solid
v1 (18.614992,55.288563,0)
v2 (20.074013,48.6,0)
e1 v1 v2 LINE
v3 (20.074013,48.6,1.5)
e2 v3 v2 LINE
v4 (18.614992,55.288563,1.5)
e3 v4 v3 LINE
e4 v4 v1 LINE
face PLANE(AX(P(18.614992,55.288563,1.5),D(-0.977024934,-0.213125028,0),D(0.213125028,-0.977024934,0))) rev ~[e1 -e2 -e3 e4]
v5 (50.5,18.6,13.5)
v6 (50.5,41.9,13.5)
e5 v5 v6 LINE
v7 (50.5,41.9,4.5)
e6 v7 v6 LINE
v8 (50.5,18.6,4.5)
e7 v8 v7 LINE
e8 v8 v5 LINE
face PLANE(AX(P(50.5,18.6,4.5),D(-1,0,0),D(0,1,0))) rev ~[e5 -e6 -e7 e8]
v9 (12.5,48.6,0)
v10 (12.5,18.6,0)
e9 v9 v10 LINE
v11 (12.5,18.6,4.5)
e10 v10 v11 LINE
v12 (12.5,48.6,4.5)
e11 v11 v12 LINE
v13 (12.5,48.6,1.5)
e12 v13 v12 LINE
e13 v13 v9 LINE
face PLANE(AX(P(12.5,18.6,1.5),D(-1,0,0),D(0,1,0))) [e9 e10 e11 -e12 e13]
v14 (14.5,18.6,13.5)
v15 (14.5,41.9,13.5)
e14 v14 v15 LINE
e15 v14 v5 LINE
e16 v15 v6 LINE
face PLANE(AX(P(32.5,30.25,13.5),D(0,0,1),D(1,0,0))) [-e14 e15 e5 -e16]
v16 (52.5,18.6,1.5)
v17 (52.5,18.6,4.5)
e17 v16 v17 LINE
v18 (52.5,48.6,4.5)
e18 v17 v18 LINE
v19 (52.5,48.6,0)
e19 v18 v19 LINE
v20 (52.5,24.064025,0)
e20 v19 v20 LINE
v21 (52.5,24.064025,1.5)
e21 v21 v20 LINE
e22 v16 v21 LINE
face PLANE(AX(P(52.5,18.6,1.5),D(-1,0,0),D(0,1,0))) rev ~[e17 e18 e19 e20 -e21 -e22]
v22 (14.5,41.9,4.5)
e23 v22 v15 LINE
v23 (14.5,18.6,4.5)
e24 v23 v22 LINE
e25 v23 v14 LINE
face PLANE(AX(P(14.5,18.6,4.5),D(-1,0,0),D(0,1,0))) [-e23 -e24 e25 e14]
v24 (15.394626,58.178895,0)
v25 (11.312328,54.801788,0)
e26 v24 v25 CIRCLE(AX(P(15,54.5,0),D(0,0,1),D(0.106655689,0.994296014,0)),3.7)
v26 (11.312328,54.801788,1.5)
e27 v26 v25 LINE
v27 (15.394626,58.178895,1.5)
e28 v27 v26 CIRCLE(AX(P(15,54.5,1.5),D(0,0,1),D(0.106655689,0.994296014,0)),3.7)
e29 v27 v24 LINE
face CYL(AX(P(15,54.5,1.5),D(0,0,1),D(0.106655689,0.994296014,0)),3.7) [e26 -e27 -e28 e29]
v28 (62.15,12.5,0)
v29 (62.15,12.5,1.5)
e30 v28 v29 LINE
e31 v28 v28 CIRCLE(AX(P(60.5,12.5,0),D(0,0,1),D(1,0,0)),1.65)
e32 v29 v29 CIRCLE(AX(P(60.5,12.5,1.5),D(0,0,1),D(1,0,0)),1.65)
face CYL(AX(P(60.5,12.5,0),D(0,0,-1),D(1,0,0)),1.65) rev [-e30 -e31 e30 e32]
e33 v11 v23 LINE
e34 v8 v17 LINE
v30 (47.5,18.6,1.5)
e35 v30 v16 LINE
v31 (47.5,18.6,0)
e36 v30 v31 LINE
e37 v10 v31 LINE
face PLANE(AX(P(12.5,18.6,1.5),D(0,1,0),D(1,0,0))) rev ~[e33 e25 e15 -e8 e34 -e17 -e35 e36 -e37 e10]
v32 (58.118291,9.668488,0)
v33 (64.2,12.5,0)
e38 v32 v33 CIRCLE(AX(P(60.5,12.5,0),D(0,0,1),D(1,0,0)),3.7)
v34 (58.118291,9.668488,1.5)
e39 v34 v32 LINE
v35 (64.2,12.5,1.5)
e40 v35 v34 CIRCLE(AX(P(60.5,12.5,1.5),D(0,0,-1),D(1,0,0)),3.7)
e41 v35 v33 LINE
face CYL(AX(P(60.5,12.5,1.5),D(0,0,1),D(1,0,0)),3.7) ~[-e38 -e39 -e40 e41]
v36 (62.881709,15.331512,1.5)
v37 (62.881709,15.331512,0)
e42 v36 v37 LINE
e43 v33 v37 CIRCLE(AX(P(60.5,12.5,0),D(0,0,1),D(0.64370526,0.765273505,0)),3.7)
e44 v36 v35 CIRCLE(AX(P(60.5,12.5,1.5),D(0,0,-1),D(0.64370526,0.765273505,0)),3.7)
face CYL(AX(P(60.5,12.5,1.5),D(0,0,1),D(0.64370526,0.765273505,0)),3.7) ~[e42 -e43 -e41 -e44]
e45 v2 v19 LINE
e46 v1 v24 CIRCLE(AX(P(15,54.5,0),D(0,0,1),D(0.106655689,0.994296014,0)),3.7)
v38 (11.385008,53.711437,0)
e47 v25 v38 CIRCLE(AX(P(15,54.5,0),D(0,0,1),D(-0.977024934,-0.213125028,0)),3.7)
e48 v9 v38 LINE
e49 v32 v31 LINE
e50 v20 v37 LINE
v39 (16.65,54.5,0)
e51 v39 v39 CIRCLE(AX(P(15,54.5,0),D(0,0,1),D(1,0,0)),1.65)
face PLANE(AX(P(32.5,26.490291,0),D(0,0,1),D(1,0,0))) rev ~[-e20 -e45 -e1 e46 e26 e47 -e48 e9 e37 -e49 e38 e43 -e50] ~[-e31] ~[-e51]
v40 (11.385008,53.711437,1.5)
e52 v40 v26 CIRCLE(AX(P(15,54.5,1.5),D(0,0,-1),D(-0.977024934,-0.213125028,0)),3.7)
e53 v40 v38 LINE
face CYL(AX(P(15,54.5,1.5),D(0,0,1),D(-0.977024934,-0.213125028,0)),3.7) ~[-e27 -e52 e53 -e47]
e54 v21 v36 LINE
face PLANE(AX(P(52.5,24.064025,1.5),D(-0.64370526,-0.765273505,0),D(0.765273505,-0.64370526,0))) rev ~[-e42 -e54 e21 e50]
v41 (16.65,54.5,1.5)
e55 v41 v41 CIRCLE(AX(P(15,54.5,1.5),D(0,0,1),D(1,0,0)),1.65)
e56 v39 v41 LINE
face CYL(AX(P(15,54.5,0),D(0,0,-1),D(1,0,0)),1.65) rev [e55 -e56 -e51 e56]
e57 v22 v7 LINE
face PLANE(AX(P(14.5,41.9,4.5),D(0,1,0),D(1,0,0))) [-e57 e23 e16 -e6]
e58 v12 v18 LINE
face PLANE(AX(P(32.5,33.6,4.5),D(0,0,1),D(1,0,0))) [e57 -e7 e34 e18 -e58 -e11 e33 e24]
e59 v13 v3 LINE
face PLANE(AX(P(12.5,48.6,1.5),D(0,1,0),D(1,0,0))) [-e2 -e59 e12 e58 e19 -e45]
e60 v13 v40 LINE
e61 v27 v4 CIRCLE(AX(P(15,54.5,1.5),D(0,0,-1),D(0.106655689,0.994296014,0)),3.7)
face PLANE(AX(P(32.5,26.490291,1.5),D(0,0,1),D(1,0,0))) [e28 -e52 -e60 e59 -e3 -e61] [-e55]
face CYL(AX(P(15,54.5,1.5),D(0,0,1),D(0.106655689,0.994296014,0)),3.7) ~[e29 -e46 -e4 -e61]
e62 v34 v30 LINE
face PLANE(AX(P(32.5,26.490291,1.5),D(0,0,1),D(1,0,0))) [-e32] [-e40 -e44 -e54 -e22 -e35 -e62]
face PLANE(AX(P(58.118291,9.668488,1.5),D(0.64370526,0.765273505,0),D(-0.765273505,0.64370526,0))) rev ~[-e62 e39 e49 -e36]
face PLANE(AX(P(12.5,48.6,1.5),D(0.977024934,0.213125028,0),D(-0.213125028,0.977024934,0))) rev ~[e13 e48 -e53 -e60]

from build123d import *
from build123d import SkipClean  # not in build123d's __all__

# Parameters (mm, degrees)
F0_R      = 1.65
F1_DEPTH  = 1.5
F3_DEPTH  = 1.501
F4_DEPTH  = 1.5
F5_W      = 40
F5_H      = 30
F6_DEPTH  = 3
F7_W      = 36
F7_H      = 23.3
F8_DEPTH  = 9
F10_DEPTH = 1.501


with BuildPart() as f1:
    # F0 (on Top) → F1 (new body)
    with BuildSketch(Plane.XY):
        with BuildLine():
            ThreePointArc((-0.73370891, 14), (-0.4891889552, 6.9935887205), (0, 0))
            Line((0, 0), (65, 0))
            ThreePointArc((65, 0), (65.4891889552, 6.9935887205), (65.73370891, 14))
            ThreePointArc((65.73370891, 14), (65.7334108185, 21.0021379582), (65.488741818, 28))
            Line((65.488741818, 28), (57.299411547, 50.5))
            ThreePointArc((57.299411547, 50.5), (32.5, 63.5), (7.700588453, 50.5))
            Line((7.700588453, 50.5), (-0.488741818, 28))
            ThreePointArc((-0.488741818, 28), (-0.7334108185, 21.0021379582), (-0.73370891, 14))
        make_face()
        with Locations((4.5, 12.5)):
            Circle(F0_R, mode=Mode.SUBTRACT)
        with Locations((60.5, 12.5)):
            Circle(F0_R, mode=Mode.SUBTRACT)
        with Locations((15, 54.5)):
            Circle(F0_R, mode=Mode.SUBTRACT)
    extrude(amount=F1_DEPTH)

    # F2 (on face) → F3 (cut, through all)
    with BuildSketch(Plane.XY.offset(1.5)):
        with BuildLine():
            ThreePointArc((15.3946260476, 58.178895253), (17.4713893755, 57.2535857631), (18.6149922575, 55.2885626028))
            Line((18.6149922575, 55.2885626028), (20.0740134556, 48.6))
            Line((20.0740134556, 48.6), (52.5, 48.6))
            Line((52.5, 48.6), (52.5, 24.064025175))
            Line((52.5, 24.064025175), (62.8817094627, 15.3315119698))
            ThreePointArc((62.8817094627, 15.3315119698), (63.8542752579, 14.0616777817), (64.2, 12.5))
            ThreePointArc((64.2, 12.5), (62.0616777817, 9.1457247421), (58.1182905373, 9.6684880302))
            Line((58.1182905373, 9.6684880302), (47.5, 18.6))
            Line((47.5, 18.6), (17.5, 18.6))
            Line((17.5, 18.6), (6.8817094627, 9.6684880302))
            ThreePointArc((6.8817094627, 9.6684880302), (1.6684880302, 10.1182905373), (2.1182905373, 15.3315119698))
            Line((2.1182905373, 15.3315119698), (12.5, 24.064025175))
            Line((12.5, 24.064025175), (12.5, 48.6))
            Line((12.5, 48.6), (11.3850077425, 53.7114373972))
            ThreePointArc((11.3850077425, 53.7114373972), (11.308192582, 54.2539146721), (11.3123280961, 54.8017878876))
            ThreePointArc((11.3123280961, 54.8017878876), (9.4060764304, 52.7351735725), (7.700588453, 50.5))
            Line((7.700588453, 50.5), (-0.488741818, 28))
            ThreePointArc((-0.488741818, 28), (-0.733560046, 13.9914611719), (0, 0))
            Line((0, 0), (65, 0))
            ThreePointArc((65, 0), (65.733560046, 13.9914611719), (65.488741818, 28))
            Line((65.488741818, 28), (57.299411547, 50.5))
            ThreePointArc((57.299411547, 50.5), (37.9351551683, 63.0061258111), (15.3946260476, 58.178895253))
        make_face()
    extrude(amount=-F3_DEPTH, mode=Mode.SUBTRACT)

    # F2 (on face) → F4 (join)
    with BuildSketch(Plane.XY.offset(1.5)):
        with BuildLine():
            ThreePointArc((11.3123280961, 54.8017878876), (13.2791635515, 56.5801728664), (15.3946260476, 58.178895253))
            ThreePointArc((15.3946260476, 58.178895253), (12.6415574435, 57.3509206772), (11.3123280961, 54.8017878876))
        make_face()
    with SkipClean():  # cleaning this boolean's faces spoils the solid; the shape is the same uncleaned
        extrude(amount=-F4_DEPTH)

    # F5 (on face) → F6 (join)
    with BuildSketch(Plane.XY.offset(1.5)):
        with Locations((32.5, 33.6)):
            Rectangle(F5_W, F5_H)
    extrude(amount=F6_DEPTH)

    # F7 (on face) → F8 (join)
    with BuildSketch(Plane.XY.offset(4.5)):
        with Locations((32.5, 30.25)):
            Rectangle(F7_W, F7_H)
    extrude(amount=F8_DEPTH)

    # F9 (on face) → F10 (cut, through all)
    with BuildSketch(Plane.XY.offset(1.5)):
        with BuildLine():
            ThreePointArc((7.348777143, 10.0613592332), (8.0174859123, 11.2000796728), (8.25, 12.5))
            ThreePointArc((8.25, 12.5), (6.3550732217, 15.7590187699), (2.5853582175, 15.7243831727))
            ThreePointArc((2.5853582175, 15.7243831727), (1.6302243549, 10.0861052742), (7.348777143, 10.0613592332))
        make_face()
        with BuildLine():
            ThreePointArc((2.5853582175, 15.7243831727), (6.3550732217, 15.7590187699), (8.25, 12.5))
            ThreePointArc((8.25, 12.5), (8.0174859123, 11.2000796728), (7.348777143, 10.0613592332))
            Line((7.348777143, 10.0613592332), (17.5, 18.6))
            Line((17.5, 18.6), (12.5, 18.6))
            Line((12.5, 18.6), (12.5, 24.064025175))
            Line((12.5, 24.064025175), (2.5853582175, 15.7243831727))
        make_face()
    extrude(amount=-F10_DEPTH, mode=Mode.SUBTRACT)


solid = f1.part
